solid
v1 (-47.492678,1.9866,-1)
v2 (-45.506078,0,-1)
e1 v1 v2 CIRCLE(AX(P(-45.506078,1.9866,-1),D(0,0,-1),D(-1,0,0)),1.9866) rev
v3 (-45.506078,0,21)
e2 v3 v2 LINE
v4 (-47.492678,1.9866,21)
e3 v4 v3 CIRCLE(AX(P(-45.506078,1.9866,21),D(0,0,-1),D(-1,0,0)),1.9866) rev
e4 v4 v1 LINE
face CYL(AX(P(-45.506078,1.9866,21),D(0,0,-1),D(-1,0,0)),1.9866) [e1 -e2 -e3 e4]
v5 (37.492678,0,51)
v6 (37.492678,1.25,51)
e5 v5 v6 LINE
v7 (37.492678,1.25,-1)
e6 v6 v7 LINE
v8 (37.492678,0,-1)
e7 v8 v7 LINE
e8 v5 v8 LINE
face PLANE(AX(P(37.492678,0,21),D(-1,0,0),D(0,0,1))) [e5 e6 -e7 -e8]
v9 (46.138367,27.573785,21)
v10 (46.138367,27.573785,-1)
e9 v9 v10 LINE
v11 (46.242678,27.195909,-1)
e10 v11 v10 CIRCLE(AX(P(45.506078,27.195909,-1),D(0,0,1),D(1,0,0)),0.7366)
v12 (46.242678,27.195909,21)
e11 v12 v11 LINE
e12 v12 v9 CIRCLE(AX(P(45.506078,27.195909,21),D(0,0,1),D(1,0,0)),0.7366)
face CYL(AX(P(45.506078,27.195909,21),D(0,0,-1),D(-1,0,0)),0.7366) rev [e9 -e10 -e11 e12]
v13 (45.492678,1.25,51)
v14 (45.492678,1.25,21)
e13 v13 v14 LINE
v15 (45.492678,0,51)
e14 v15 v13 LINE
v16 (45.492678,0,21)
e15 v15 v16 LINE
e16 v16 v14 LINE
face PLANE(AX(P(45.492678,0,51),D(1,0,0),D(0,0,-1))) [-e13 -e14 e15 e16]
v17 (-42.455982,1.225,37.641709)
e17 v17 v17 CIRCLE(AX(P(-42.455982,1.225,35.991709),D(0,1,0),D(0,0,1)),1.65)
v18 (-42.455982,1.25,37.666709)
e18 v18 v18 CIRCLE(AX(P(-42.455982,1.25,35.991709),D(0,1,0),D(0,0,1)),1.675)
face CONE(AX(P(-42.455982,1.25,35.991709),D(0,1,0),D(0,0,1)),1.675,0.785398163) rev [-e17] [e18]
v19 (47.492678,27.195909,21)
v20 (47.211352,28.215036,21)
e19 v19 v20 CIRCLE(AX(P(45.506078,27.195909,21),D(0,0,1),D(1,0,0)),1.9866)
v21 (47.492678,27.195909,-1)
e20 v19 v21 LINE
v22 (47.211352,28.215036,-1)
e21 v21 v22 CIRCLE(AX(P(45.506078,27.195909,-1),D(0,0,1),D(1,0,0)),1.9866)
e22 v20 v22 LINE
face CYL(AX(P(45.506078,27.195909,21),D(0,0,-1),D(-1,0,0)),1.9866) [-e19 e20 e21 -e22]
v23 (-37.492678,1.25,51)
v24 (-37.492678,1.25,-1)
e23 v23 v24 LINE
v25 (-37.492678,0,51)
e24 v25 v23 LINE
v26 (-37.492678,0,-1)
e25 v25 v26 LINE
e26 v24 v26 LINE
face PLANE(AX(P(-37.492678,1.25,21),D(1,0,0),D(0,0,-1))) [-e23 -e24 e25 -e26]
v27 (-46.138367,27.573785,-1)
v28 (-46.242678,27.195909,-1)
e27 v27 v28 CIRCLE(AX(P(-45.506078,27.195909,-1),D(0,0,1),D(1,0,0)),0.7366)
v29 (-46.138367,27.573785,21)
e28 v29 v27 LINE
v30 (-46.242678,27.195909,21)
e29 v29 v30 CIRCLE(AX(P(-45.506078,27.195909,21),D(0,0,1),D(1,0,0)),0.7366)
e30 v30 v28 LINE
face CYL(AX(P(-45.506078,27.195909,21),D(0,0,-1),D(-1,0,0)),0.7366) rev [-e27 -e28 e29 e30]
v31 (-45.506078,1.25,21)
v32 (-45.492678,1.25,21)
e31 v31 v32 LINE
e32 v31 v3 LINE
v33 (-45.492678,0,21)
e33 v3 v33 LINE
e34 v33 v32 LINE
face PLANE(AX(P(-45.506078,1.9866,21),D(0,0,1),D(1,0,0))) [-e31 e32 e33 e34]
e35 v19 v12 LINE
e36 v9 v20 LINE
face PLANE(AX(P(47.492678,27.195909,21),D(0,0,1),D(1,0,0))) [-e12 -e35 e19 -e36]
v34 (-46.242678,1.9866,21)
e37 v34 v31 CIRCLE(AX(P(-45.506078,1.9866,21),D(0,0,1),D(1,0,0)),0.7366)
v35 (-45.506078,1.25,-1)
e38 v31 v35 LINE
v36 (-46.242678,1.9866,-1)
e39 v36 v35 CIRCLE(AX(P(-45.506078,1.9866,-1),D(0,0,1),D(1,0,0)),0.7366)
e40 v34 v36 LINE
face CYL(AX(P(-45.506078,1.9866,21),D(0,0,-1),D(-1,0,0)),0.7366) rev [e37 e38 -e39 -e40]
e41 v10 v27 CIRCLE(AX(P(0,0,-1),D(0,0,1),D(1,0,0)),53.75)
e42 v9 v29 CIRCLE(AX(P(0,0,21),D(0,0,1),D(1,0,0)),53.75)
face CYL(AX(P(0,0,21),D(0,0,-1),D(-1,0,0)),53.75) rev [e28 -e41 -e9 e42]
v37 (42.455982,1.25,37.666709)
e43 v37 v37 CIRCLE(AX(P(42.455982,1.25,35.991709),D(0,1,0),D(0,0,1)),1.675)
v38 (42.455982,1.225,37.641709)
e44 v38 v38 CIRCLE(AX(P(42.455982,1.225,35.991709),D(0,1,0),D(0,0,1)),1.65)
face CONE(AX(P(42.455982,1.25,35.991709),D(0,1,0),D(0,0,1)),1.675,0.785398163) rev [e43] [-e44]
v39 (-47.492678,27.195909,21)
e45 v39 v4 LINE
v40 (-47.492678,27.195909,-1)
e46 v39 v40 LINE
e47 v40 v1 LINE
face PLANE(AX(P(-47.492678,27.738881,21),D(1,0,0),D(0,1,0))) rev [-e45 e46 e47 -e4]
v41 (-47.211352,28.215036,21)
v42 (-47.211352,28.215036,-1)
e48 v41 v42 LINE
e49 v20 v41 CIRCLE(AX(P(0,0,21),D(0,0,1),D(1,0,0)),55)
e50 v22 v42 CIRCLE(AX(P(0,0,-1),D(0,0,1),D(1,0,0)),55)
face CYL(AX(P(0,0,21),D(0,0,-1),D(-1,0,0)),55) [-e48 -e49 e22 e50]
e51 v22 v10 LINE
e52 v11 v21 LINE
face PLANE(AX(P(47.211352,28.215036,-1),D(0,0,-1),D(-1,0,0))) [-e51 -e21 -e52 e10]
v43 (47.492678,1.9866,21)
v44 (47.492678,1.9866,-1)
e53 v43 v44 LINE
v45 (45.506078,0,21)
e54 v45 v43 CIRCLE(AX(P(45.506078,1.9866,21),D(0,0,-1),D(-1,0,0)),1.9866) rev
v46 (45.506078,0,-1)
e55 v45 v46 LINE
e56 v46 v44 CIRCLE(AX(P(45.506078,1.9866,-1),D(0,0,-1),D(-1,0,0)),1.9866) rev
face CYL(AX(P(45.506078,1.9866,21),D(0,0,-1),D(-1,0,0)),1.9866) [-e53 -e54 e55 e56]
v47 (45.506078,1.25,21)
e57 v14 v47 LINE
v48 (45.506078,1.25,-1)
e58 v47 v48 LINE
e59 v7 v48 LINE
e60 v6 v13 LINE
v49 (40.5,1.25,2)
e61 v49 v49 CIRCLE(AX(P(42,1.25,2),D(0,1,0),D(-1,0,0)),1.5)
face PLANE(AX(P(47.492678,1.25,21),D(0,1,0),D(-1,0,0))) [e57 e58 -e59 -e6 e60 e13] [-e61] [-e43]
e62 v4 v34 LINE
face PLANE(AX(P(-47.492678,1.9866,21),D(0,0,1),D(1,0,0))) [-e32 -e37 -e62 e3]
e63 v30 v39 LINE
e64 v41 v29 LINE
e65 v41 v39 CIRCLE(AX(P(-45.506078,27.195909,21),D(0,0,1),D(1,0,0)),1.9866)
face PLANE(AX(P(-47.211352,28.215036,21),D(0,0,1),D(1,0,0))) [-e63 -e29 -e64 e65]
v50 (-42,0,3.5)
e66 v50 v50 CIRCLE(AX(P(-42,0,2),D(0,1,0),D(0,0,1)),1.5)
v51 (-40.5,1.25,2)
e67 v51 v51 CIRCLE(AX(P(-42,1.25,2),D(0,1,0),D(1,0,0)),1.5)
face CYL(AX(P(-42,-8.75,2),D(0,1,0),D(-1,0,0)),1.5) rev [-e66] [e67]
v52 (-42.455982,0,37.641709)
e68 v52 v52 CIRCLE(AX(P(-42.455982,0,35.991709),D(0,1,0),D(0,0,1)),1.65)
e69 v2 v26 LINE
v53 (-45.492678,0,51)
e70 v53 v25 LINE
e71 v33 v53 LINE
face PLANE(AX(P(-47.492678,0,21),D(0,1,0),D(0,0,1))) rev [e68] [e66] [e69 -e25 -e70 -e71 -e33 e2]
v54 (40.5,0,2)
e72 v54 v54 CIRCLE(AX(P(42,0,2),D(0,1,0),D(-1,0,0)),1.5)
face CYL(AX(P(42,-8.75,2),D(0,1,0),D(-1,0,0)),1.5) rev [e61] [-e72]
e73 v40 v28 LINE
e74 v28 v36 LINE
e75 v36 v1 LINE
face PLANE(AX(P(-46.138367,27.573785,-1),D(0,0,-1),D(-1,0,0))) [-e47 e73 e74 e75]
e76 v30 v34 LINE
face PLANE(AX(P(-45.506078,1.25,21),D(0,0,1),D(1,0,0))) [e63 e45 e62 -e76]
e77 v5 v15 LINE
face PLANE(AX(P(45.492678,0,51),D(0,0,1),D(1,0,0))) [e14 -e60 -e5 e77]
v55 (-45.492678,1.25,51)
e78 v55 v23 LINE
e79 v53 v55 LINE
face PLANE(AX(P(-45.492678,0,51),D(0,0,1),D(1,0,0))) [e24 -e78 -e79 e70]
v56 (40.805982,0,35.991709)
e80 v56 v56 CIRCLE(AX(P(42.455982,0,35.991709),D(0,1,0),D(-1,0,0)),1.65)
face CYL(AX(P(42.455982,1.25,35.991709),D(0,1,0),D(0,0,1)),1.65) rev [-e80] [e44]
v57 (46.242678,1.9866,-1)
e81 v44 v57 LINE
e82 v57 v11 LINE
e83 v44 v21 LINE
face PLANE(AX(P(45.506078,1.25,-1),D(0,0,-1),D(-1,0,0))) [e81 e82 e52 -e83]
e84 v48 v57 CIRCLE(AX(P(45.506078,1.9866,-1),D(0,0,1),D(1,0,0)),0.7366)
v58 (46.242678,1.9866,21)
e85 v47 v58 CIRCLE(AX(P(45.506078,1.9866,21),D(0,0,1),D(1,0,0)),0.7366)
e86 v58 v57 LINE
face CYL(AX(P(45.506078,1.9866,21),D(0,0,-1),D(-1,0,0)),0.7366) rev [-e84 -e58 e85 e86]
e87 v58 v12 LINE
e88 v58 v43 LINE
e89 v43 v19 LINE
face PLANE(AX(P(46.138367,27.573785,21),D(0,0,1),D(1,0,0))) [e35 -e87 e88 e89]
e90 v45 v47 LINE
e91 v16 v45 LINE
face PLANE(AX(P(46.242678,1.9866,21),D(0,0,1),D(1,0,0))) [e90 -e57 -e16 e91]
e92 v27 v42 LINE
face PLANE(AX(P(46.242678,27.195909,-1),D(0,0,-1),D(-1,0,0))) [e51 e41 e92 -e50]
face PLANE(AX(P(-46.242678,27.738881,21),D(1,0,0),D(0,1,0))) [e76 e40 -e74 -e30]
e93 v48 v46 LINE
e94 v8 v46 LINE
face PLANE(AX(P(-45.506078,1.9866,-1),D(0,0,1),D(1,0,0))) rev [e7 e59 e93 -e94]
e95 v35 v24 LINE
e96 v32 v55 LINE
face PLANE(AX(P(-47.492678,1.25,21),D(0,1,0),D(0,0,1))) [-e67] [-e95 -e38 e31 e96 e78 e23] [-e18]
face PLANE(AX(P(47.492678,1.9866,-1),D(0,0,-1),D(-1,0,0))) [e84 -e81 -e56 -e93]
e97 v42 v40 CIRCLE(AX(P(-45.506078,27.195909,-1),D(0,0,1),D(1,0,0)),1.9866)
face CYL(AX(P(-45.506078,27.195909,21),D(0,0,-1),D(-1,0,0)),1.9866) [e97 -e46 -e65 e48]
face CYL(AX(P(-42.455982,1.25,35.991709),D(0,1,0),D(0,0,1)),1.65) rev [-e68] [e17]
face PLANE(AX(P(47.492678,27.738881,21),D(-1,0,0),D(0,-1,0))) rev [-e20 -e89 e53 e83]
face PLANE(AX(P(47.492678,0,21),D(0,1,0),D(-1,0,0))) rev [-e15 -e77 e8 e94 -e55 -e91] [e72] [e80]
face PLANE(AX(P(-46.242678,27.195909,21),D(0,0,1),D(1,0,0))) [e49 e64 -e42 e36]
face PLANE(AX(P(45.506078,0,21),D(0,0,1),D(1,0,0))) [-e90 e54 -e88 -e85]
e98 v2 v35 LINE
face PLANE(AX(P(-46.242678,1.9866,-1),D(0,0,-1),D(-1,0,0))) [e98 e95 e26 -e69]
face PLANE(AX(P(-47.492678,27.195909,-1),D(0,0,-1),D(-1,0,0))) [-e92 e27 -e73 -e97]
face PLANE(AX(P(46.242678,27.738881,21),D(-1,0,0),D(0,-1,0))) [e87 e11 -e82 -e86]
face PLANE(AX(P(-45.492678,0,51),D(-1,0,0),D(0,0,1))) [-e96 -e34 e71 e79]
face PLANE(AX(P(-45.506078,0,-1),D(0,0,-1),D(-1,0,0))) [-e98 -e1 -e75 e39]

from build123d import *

# Parameters (mm, degrees)
BASE_FLANGE1_START                    = -1
BASE_FLANGE1_DEPTH                    = 22
SKETCH37_W                            = 8
SKETCH37_H                            = 30
BOSS_EXTRUDE1_DEPTH                   = 1.25
TAP_DRILL_FOR_M4X0_7_TAP1_D           = 3.3
TAP_DRILL_FOR_M4X0_7_TAP1_DEPTH       = 10
TAP_DRILL_FOR_M4X0_7_TAP1_CSINK_D     = 3.35
TAP_DRILL_FOR_M4X0_7_TAP1_CSINK_ANGLE = 90
TAP_DRILL_FOR_M4X0_7_TAP1_TIP         = 0.991420021
SKETCH36_R                            = 1.5
CUT_EXTRUDE1_DEPTH                    = 10


# Read off the part's stored shape, not the designer's step: Base-Flange1
with BuildPart() as part:
    # Base-Flange1 outline → Base-Flange1 (new body)
    with BuildSketch(Plane.XY.offset(BASE_FLANGE1_START)):
        with BuildLine():
            Line((-45.506078027, 0), (-37.492678027, 0))
            Line((-37.492678027, 0), (-37.492678027, 1.25))
            Line((-37.492678027, 1.25), (-45.506078027, 1.25))
            ThreePointArc((-45.506078027, 1.25), (-46.026932882, 1.465745145), (-46.242678027, 1.9866))
            Line((-46.242678027, 1.9866), (-46.242678027, 27.195908555))
            ThreePointArc((-46.242678027, 27.195908555), (-46.216121498, 27.391913221), (-46.138366789, 27.573784833))
            ThreePointArc((-46.138366789, 27.573784833), (0, 53.75), (46.138366789, 27.573784833))
            ThreePointArc((46.138366789, 27.573784833), (46.216121498, 27.391913221), (46.242678027, 27.195908555))
            Line((46.242678027, 27.195908555), (46.242678027, 1.9866))
            ThreePointArc((46.242678027, 1.9866), (46.026932882, 1.465745145), (45.506078027, 1.25))
            Line((45.506078027, 1.25), (37.492678027, 1.25))
            Line((37.492678027, 1.25), (37.492678027, 0))
            Line((37.492678027, 0), (45.506078027, 0))
            ThreePointArc((45.506078027, 0), (46.910816359, 0.581861668), (47.492678027, 1.9866))
            Line((47.492678027, 1.9866), (47.492678027, 27.195908555))
            ThreePointArc((47.492678027, 27.195908555), (47.421055437, 27.724530423), (47.211352064, 28.215035643))
            ThreePointArc((47.211352064, 28.215035643), (0, 55), (-47.211352064, 28.215035643))
            ThreePointArc((-47.211352064, 28.215035643), (-47.421055437, 27.724530423), (-47.492678027, 27.195908555))
            Line((-47.492678027, 27.195908555), (-47.492678027, 1.9866))
            ThreePointArc((-47.492678027, 1.9866), (-46.910816359, 0.581861668), (-45.506078027, 0))
        make_face()
    extrude(amount=BASE_FLANGE1_DEPTH)

    # Sketch37 → Boss-Extrude1 (add)
    with BuildSketch(Plane(origin=(0, 1.25, 0), x_dir=(1, 0, 0), z_dir=(0, 1, 0))):
        with Locations((41.492678027, -36)):
            Rectangle(SKETCH37_W, SKETCH37_H)
        with Locations((-41.492678027, -36)):
            Rectangle(SKETCH37_W, SKETCH37_H)
    extrude(amount=-BOSS_EXTRUDE1_DEPTH)

    # Tap Drill for M4x0.7 Tap1
    with Locations(Plane(origin=(0, 1.25, 0), x_dir=(1, 0, 0), z_dir=(0, 1, 0))):
        with Locations((-42.455982414, -35.991709022), (42.455982414, -35.991709022)):
            CounterSinkHole(TAP_DRILL_FOR_M4X0_7_TAP1_D / 2, TAP_DRILL_FOR_M4X0_7_TAP1_CSINK_D / 2, depth=TAP_DRILL_FOR_M4X0_7_TAP1_DEPTH, counter_sink_angle=TAP_DRILL_FOR_M4X0_7_TAP1_CSINK_ANGLE)
            with Locations((0, 0, -(TAP_DRILL_FOR_M4X0_7_TAP1_DEPTH + TAP_DRILL_FOR_M4X0_7_TAP1_TIP / 2))):  # 118° drill point
                Cone(0, TAP_DRILL_FOR_M4X0_7_TAP1_D / 2, TAP_DRILL_FOR_M4X0_7_TAP1_TIP, mode=Mode.SUBTRACT)

    # Sketch36 → Cut-Extrude1 (cut)
    with BuildSketch(Plane(origin=(0, 1.25, 0), x_dir=(1, 0, 0), z_dir=(0, 1, 0))):
        with Locations(Location((42.000000004, -2, 0), (0, 0, 180))):
            Circle(SKETCH36_R)
        with Locations(Location((-42.000000004, -2, 0), (0, 0, 270))):
            Circle(SKETCH36_R)
    extrude(amount=-CUT_EXTRUDE1_DEPTH, mode=Mode.SUBTRACT)


solid = part.part
